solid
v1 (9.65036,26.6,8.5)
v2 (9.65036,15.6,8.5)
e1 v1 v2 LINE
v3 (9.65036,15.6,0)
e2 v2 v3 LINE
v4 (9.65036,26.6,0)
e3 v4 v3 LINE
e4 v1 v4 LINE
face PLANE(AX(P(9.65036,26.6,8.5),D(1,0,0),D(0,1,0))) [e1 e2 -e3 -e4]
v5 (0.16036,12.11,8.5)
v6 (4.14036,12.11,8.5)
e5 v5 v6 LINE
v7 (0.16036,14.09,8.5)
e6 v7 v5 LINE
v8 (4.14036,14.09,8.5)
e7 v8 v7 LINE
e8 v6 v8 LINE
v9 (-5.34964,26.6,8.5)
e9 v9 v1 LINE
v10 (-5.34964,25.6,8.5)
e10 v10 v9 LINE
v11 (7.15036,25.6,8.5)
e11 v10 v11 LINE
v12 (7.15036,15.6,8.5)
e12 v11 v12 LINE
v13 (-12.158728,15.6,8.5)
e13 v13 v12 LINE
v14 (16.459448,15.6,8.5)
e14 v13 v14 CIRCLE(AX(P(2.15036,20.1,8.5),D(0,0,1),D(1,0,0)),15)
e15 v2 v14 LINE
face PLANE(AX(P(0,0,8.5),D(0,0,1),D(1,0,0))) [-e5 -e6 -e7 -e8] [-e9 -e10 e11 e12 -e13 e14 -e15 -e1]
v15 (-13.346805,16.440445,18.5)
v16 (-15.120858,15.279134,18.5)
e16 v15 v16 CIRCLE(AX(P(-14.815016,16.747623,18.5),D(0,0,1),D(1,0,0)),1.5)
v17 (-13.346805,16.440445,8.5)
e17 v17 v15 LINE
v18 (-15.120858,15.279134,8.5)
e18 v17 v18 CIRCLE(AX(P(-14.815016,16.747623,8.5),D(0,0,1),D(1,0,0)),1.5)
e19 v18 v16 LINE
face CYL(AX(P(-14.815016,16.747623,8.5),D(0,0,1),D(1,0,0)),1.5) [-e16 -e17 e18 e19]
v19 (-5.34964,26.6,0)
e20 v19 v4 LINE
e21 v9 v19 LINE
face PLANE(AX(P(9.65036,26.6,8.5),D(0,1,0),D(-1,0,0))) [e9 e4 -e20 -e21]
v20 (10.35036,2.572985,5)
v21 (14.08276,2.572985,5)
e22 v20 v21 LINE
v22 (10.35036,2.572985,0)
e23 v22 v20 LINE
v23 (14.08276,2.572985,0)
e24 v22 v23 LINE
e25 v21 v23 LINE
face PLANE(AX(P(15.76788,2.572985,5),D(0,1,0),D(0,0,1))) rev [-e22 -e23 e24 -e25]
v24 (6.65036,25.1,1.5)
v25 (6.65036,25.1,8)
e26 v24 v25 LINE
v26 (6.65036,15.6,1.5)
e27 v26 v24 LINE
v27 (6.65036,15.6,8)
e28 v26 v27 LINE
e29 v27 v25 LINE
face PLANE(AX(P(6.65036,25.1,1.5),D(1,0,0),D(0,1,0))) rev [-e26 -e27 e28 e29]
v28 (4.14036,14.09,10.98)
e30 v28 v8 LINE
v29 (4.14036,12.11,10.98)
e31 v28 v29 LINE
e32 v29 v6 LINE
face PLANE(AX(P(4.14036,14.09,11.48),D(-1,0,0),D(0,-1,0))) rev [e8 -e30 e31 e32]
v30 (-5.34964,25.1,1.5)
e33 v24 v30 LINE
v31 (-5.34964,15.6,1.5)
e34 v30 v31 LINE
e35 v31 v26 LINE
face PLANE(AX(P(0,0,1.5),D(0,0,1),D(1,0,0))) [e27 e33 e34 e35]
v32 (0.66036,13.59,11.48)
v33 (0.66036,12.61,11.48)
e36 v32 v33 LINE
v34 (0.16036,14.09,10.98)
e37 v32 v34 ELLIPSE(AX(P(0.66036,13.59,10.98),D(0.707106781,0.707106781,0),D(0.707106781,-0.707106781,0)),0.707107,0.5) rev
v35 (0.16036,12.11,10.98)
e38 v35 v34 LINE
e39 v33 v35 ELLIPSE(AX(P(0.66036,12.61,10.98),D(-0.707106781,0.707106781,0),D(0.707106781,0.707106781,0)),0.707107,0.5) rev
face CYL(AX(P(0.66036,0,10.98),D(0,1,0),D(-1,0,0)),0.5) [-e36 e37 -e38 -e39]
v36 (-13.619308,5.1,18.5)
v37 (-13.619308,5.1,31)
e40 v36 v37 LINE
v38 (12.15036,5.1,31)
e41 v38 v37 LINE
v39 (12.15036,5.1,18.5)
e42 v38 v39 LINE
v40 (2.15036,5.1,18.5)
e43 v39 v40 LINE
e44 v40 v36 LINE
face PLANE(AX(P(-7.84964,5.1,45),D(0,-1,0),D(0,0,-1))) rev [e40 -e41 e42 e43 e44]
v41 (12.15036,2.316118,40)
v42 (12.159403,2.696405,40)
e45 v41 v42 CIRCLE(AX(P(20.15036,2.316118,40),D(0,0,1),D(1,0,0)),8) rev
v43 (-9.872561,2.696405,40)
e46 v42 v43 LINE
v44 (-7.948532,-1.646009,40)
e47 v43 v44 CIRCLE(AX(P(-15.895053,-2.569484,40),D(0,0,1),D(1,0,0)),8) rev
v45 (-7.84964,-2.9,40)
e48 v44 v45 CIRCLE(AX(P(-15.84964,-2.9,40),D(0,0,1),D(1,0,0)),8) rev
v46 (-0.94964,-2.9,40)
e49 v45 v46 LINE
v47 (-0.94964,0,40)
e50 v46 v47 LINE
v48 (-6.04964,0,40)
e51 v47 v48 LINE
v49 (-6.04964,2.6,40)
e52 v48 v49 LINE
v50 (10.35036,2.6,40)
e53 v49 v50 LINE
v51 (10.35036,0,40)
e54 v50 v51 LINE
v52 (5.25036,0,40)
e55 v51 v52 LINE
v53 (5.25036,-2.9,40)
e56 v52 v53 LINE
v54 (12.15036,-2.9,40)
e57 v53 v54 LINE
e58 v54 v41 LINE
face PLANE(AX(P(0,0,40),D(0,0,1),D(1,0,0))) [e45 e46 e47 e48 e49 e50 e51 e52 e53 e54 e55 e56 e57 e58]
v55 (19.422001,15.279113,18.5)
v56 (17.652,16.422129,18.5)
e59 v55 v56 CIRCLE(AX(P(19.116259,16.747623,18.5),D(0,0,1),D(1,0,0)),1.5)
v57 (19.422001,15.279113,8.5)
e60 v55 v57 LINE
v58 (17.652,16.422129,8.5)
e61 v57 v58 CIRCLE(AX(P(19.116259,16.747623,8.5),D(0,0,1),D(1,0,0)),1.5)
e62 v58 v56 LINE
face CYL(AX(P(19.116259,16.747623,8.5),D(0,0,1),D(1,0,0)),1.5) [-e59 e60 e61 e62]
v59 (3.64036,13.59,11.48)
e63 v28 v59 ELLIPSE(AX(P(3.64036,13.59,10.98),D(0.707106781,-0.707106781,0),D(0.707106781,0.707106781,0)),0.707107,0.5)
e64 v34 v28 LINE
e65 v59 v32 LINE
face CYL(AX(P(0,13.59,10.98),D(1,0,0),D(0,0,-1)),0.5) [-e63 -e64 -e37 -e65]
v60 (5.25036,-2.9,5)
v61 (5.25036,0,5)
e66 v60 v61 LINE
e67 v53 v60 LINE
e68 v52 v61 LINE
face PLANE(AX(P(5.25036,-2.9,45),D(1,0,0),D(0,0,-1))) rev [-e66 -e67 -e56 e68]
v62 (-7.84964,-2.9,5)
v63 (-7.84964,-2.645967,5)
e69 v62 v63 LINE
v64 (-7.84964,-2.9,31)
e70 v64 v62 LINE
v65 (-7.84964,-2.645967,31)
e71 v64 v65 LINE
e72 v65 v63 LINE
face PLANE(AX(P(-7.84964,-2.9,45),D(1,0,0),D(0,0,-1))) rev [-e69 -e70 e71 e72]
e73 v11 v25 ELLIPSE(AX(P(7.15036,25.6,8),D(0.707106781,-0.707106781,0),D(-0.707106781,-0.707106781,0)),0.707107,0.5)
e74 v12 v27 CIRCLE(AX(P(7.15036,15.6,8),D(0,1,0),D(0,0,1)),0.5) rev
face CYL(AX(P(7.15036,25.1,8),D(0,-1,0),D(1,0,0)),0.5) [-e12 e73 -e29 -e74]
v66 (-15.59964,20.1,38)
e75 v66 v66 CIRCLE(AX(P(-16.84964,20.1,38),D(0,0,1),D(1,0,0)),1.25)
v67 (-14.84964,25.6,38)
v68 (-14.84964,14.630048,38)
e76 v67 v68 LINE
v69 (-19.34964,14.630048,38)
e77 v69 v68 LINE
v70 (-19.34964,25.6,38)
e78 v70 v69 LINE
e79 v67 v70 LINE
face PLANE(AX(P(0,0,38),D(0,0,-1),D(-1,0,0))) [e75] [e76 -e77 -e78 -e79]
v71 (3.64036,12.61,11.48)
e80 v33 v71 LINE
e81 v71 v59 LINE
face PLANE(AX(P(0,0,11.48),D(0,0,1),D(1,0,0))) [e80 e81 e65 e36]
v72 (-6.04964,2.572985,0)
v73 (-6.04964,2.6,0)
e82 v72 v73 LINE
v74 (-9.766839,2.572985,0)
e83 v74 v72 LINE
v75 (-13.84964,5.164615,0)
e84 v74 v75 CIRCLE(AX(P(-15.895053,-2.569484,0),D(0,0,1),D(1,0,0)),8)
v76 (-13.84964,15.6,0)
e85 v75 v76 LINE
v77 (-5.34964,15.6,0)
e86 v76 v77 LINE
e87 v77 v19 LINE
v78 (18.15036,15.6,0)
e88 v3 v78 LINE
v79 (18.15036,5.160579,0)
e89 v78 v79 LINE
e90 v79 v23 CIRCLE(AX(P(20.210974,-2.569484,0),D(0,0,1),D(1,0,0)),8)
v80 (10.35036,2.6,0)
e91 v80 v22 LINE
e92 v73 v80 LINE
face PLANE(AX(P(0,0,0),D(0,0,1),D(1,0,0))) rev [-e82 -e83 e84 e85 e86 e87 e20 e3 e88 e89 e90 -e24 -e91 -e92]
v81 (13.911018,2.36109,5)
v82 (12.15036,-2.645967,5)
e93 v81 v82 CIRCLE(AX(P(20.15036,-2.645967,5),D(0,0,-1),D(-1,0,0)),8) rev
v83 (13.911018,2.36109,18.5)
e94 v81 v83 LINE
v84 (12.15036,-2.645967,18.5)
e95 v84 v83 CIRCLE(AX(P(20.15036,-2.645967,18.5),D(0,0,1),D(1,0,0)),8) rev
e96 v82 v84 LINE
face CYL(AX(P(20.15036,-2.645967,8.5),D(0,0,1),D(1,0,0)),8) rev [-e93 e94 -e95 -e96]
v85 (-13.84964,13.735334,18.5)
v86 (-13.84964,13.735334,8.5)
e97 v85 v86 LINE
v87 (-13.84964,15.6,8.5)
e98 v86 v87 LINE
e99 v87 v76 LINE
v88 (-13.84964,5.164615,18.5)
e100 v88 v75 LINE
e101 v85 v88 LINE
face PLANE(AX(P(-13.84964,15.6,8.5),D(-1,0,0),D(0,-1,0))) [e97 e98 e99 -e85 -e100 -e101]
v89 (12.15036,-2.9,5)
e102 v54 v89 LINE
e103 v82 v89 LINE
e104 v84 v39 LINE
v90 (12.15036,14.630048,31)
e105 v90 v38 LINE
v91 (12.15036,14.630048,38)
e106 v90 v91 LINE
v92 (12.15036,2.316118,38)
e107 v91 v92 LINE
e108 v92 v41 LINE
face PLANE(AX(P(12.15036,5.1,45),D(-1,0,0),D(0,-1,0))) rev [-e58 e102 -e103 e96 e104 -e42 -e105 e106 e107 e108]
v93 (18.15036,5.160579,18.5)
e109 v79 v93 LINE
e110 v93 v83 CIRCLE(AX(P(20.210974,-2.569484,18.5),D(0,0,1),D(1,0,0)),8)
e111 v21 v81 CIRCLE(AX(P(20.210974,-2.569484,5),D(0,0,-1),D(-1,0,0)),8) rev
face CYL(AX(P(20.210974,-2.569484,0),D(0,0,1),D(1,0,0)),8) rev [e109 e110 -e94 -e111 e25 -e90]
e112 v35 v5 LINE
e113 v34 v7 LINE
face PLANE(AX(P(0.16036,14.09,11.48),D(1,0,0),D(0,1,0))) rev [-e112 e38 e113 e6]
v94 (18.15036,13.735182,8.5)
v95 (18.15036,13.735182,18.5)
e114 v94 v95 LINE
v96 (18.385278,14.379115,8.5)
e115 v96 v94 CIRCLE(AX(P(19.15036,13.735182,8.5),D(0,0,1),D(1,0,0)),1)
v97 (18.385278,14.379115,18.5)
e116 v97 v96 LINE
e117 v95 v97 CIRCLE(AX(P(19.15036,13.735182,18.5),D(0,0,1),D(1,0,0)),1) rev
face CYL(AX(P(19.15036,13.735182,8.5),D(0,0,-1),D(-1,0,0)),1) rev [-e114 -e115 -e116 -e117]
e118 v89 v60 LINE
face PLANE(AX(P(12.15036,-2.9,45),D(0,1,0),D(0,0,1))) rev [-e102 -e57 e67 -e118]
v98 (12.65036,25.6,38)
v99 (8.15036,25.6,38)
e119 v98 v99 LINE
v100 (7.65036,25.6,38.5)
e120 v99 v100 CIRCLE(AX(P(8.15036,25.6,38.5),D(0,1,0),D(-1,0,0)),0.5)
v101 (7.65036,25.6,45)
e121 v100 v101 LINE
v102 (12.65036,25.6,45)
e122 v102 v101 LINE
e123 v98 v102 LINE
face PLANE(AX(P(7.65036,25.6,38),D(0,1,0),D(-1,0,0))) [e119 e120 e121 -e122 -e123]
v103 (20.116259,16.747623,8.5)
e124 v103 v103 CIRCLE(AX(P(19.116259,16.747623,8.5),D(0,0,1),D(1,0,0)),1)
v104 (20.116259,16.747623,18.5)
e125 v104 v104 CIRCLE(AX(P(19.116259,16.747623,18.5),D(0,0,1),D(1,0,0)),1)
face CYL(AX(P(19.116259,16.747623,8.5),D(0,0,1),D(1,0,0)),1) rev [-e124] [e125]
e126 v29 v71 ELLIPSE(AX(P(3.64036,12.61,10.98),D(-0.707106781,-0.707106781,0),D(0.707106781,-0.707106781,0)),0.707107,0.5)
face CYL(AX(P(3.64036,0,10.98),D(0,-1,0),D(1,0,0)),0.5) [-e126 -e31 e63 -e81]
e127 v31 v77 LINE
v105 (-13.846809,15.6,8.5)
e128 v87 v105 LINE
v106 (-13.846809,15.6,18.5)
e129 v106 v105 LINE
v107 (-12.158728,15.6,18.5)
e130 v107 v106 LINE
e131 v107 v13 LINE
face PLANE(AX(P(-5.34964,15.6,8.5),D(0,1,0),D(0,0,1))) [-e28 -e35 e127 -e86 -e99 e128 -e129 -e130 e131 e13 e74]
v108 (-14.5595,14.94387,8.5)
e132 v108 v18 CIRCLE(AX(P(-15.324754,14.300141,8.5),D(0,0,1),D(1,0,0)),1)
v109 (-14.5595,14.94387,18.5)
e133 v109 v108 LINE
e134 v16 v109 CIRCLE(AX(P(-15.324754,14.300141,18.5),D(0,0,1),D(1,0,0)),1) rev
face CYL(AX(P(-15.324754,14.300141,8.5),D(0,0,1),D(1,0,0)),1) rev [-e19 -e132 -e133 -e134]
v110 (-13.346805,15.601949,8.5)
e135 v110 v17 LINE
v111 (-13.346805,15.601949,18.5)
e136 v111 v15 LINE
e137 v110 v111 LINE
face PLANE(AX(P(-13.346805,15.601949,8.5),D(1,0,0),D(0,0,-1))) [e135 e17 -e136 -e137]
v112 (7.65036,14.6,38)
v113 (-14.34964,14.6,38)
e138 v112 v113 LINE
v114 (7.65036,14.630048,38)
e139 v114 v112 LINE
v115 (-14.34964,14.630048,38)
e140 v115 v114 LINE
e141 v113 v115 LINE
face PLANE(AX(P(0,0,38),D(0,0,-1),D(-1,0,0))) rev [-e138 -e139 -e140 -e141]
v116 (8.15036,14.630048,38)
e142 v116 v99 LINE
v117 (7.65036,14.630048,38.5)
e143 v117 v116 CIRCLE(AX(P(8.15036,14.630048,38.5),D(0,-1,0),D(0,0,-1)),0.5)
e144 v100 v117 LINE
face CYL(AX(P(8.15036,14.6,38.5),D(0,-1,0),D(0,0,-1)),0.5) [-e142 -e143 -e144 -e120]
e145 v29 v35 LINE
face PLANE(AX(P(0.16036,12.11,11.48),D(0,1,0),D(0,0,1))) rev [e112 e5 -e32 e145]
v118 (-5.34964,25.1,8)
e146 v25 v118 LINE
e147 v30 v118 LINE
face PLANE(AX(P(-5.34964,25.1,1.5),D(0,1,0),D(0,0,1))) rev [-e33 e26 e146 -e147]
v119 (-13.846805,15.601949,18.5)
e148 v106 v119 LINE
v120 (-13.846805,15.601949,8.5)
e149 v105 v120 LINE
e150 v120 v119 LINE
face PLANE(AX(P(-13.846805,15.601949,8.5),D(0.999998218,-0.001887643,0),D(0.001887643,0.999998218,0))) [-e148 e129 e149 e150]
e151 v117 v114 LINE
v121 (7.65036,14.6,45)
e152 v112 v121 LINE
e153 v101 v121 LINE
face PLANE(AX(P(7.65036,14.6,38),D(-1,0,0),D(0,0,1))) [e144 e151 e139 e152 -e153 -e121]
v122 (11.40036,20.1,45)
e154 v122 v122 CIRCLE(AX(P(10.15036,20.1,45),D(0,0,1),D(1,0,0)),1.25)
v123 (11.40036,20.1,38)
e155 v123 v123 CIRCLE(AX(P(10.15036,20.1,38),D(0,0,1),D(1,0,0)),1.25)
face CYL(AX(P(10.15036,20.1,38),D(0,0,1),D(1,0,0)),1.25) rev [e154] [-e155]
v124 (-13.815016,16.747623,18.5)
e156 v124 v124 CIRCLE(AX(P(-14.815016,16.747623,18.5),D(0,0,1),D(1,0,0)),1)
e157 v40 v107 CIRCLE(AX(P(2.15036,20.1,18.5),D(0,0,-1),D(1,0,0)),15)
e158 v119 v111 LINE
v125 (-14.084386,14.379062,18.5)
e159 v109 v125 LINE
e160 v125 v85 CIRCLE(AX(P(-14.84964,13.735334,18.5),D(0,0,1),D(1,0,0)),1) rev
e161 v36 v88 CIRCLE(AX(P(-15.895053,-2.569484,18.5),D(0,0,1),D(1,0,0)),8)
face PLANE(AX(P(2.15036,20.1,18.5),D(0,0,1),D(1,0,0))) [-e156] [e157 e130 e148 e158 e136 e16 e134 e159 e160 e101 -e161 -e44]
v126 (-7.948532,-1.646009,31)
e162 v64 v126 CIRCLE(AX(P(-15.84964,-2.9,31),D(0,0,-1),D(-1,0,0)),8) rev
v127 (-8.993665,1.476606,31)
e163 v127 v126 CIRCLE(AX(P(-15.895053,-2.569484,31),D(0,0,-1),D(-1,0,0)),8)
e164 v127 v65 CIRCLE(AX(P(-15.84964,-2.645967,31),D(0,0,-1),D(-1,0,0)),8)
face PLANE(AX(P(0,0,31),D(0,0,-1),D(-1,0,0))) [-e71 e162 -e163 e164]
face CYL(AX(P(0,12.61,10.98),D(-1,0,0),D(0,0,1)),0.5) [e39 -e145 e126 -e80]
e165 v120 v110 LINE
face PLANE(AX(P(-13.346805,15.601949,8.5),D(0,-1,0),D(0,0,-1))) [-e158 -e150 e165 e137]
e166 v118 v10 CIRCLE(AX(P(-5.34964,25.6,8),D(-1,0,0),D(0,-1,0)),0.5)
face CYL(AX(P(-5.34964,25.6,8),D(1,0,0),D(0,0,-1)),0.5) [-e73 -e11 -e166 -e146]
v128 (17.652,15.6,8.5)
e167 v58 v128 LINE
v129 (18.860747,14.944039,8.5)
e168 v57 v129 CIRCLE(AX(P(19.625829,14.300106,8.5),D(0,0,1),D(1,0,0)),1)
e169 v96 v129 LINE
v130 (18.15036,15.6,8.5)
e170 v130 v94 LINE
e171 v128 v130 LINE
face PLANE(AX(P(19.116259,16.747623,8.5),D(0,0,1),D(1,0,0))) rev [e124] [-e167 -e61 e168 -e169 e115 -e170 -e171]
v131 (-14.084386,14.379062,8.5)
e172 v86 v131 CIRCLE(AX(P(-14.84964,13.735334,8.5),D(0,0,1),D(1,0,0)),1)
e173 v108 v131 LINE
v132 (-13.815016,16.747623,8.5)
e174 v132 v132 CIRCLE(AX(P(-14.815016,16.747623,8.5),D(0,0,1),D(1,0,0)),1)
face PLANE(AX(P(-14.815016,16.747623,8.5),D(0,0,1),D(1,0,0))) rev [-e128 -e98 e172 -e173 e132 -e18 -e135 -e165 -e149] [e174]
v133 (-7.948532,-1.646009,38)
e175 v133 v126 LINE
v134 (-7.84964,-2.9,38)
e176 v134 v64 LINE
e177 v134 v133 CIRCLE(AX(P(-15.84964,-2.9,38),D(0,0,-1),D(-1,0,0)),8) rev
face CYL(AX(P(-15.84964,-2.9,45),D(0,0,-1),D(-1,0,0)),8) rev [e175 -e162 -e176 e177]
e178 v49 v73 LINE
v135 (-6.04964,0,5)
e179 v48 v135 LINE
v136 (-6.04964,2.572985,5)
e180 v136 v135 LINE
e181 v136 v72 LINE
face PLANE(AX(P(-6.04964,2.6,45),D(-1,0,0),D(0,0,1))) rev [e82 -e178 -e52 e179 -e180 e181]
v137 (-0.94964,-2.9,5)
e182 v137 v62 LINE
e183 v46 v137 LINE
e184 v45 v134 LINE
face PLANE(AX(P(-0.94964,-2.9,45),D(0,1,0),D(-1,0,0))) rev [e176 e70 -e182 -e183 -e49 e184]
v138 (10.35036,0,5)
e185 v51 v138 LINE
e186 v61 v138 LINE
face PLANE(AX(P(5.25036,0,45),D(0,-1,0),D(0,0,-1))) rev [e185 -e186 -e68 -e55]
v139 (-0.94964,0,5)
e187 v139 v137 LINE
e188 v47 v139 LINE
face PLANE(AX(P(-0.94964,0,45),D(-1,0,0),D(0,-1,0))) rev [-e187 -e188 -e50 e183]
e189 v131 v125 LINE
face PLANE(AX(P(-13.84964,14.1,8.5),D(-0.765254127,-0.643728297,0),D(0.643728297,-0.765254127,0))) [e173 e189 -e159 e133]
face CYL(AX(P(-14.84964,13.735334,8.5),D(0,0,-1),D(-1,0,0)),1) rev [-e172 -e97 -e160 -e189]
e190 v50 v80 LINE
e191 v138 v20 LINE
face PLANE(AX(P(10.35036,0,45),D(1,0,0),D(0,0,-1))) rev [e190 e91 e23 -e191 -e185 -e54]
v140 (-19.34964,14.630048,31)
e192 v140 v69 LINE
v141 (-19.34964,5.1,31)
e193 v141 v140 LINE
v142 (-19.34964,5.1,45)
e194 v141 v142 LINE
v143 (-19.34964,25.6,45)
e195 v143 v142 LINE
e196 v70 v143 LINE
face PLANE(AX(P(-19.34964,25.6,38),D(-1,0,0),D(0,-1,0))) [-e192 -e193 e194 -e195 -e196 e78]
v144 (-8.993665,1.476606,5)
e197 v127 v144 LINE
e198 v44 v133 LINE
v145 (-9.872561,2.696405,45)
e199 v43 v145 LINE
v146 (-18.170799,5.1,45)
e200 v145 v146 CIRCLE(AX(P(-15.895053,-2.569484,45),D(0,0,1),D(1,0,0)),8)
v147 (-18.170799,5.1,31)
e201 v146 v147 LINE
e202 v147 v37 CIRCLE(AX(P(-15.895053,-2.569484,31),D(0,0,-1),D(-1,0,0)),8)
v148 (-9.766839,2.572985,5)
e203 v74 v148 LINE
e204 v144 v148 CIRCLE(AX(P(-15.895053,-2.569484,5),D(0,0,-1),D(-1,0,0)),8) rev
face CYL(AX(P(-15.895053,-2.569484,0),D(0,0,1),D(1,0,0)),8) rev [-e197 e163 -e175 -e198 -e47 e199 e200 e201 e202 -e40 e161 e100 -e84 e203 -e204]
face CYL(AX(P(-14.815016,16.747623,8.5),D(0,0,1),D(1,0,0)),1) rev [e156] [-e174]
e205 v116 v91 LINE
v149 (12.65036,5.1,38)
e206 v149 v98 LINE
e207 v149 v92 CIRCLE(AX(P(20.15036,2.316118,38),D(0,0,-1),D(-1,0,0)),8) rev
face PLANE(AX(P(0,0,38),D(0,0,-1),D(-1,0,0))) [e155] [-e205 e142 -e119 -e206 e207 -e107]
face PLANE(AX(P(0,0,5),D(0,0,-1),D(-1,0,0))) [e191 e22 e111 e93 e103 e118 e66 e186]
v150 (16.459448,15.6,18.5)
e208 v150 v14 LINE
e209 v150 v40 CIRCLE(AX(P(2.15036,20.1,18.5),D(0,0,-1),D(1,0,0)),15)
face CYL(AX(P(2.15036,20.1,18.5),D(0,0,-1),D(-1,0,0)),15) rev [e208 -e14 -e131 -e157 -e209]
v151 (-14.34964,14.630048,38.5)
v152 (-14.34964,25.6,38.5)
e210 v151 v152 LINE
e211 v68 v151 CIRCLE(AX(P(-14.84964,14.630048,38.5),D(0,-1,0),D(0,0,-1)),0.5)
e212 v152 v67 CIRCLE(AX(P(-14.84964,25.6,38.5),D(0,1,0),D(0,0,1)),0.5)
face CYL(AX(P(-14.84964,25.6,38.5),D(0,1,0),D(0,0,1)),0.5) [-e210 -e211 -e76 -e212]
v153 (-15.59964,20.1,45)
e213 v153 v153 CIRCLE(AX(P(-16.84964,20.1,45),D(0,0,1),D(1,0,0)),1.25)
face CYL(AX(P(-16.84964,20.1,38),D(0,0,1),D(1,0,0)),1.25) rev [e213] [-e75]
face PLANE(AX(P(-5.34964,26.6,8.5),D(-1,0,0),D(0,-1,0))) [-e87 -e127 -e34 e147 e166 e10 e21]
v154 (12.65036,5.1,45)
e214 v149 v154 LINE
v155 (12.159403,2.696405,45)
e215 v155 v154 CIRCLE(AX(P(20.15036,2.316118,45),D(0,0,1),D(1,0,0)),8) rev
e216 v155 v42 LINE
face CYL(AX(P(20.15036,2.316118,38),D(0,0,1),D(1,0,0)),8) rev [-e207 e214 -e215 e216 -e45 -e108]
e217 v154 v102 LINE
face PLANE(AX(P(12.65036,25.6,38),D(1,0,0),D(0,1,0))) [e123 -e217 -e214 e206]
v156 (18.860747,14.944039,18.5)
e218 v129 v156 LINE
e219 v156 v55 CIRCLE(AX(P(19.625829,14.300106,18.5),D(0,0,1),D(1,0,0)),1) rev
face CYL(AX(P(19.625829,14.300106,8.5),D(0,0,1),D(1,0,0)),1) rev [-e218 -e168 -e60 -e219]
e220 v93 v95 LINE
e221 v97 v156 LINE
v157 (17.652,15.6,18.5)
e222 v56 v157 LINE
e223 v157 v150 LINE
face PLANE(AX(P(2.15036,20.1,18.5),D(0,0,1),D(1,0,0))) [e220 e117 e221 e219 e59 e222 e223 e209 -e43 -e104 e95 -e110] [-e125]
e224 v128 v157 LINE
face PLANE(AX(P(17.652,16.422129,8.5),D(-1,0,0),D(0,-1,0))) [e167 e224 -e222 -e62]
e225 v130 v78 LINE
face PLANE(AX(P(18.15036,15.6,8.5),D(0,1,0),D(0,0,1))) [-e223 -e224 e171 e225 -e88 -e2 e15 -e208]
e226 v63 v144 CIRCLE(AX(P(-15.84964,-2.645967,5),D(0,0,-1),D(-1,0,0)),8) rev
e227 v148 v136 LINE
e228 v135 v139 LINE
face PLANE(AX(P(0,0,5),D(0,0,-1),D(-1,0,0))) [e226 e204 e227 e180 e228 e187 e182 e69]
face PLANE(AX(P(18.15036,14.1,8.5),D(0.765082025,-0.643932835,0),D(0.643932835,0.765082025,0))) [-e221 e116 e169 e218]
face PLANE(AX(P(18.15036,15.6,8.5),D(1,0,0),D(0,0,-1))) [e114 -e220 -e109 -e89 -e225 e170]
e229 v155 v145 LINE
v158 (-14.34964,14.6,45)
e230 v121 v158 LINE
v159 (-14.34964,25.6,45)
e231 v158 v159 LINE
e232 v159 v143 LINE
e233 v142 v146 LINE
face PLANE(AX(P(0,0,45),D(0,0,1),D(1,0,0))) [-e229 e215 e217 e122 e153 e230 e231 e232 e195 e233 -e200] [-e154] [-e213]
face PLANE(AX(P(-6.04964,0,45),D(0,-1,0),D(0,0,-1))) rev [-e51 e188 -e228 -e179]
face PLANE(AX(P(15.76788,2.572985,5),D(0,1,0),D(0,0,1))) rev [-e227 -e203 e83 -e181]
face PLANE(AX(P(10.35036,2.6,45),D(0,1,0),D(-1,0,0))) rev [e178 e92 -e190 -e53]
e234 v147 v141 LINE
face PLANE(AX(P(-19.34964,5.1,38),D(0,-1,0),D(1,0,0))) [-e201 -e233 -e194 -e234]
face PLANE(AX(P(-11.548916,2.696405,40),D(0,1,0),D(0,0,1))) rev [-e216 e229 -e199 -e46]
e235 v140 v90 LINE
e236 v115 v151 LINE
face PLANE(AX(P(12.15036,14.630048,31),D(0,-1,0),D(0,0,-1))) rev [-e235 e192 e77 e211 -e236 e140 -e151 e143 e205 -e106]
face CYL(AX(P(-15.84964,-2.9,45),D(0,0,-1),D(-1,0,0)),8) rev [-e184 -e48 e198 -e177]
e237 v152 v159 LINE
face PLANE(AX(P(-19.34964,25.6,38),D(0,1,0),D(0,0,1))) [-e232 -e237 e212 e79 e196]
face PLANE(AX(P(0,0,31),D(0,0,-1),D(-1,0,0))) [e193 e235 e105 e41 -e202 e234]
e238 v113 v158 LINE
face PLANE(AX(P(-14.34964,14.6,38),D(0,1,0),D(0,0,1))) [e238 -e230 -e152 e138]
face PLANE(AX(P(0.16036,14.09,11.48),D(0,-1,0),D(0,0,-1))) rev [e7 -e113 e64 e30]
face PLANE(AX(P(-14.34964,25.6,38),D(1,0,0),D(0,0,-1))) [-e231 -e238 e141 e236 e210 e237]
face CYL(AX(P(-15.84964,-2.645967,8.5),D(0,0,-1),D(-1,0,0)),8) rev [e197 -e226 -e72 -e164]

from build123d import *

# Parameters (mm, degrees)
BOSS_EXTRUDE1_DEPTH = 45
SKETCH2_R           = 1.25
BOSS_EXTRUDE2_DEPTH = 7
FILLET1_R           = 8
BOSS_EXTRUDE3_DEPTH = 8.5
SKETCH7_W           = 12
SKETCH7_H           = 9.5
CUT_EXTRUDE1_DEPTH  = 7
BOSS_EXTRUDE4_DEPTH = 10
SKETCH9_W           = 3.98
SKETCH9_H           = 1.98
BOSS_EXTRUDE5_DEPTH = 2.98
SKETCH11_W          = 31.5
SKETCH11_H          = 9.530048311
BOSS_EXTRUDE6_DEPTH = 7
SKETCH16_R          = 1
BOSS_EXTRUDE7_DEPTH = 10
FILLET2_R           = 1
FILLET4_R           = 0.5
FILLET5_R           = 0.5
FILLET6_R           = 0.5
FILLET7_R           = 8
FILLET8_DEPTH       = 18.5
FILLET8_START       = 18.5
FILLET8_2_DEPTH     = 26.5
SKETCH17_R          = 8
CUT_EXTRUDE2_DEPTH  = 57.192438403
SKETCH18_W          = 26.905399266
SKETCH18_H          = 5.924124609
CUT_EXTRUDE3_DEPTH  = 5
SKETCH19_W          = 27.645914842
SKETCH19_H          = 7.775413549
CUT_EXTRUDE4_DEPTH  = 5


with BuildPart() as part:
    # Sketch1 → Boss-Extrude1 (new body)
    with BuildSketch(Plane.XY):
        Polygon((-6.049640288, 0), (-0.949640288, 0), (-0.949640288, -2.9), (-7.849640288, -2.9), (-7.849640288, 5.1), (12.150359712, 5.1), (12.150359712, -2.9), (5.250359712, -2.9), (5.250359712, 0), (10.350359712, 0), (10.350359712, 2.6), (-6.049640288, 2.6), align=None)
    extrude(amount=BOSS_EXTRUDE1_DEPTH)

    # Sketch2 → Boss-Extrude2 (add)
    with BuildSketch(Plane.XY.offset(45)):
        Polygon((-19.349640288, 25.6), (-19.349640288, 5.1), (12.650359712, 5.1), (12.650359712, 25.6), (7.650359712, 25.6), (7.650359712, 14.6), (-14.349640288, 14.6), (-14.349640288, 25.6), align=None)
        with Locations((10.150359712, 20.1)):
            Circle(SKETCH2_R, mode=Mode.SUBTRACT)
        with Locations((-16.849640288, 20.1)):
            Circle(SKETCH2_R, mode=Mode.SUBTRACT)
    extrude(amount=-BOSS_EXTRUDE2_DEPTH)

    # Fillet1
    # the kernel refuses this fillet: 8 mm, written as the material it adds along each edge
    with BuildSketch(Plane(origin=(-7.849640288, 5.1, 38), x_dir=(0, -1, 0), z_dir=(0, 0, 1))) as fillet1_piece_1:
        with BuildLine():
            CenterArc((FILLET1_R, -FILLET1_R), FILLET1_R, 90, 90)
            Line((0, -FILLET1_R), (0, 0))
            Line((0, 0), (FILLET1_R, 0))
        make_face()
    extrude(amount=7)
    with BuildSketch(Plane(origin=(12.150359712, 5.1, 38), x_dir=(0, -1, 0), z_dir=(0, 0, 1))) as fillet1_piece_2:
        with BuildLine():
            CenterArc((2.783882181, 8), FILLET1_R, 249.635865194, 20.364134806)
            Line((0, 0.5), (0, 0))
            Line((0, 0), (2.783882181, 0))
        make_face()
    extrude(amount=7)

    # Sketch4 → Boss-Extrude3 (add)
    with BuildSketch(Plane(origin=(0, 0, 0), x_dir=(-1, 0, 0), z_dir=(0, 0, -1))):
        Polygon((-18.150359712, 15.6), (-18.150359712, 5.1), (13.849640288, 5.1), (13.849640288, 15.6), (5.349640288, 15.6), (5.349640288, 26.6), (-9.650359712, 26.6), (-9.650359712, 15.6), align=None)
    extrude(amount=-BOSS_EXTRUDE3_DEPTH)

    # Sketch7 → Cut-Extrude1 (cut)
    with BuildSketch(Plane.XY.offset(8.5)):
        with Locations((0.650359712, 20.35)):
            Rectangle(SKETCH7_W, SKETCH7_H)
    extrude(amount=-CUT_EXTRUDE1_DEPTH, mode=Mode.SUBTRACT)

    # Sketch8 → Boss-Extrude4 (add)
    with BuildSketch(Plane.XY.offset(8.5)):
        with BuildLine():
            Line((-13.849640288, 15.6), (-12.158728309, 15.6))
            ThreePointArc((-12.158728309, 15.6), (2.150359712, 5.1), (16.459447733, 15.6))
            Line((16.459447733, 15.6), (18.150359712, 15.6))
            Line((18.150359712, 15.6), (18.150359712, 3.937972429))
            Line((18.150359712, 3.937972429), (-13.849640288, 3.937972429))
            Line((-13.849640288, 3.937972429), (-13.849640288, 15.6))
        make_face()
    extrude(amount=BOSS_EXTRUDE4_DEPTH)

    # Sketch9 → Boss-Extrude5 (add)
    with BuildSketch(Plane.XY.offset(8.5)):
        with Locations((2.150359712, 13.1)):
            Rectangle(SKETCH9_W, SKETCH9_H)
    extrude(amount=BOSS_EXTRUDE5_DEPTH)

    # Sketch11 → Boss-Extrude6 (add)
    with BuildSketch(Plane(origin=(0, 0, 38), x_dir=(-1, 0, 0), z_dir=(0, 0, -1))):
        with Locations((3.599640288, 9.865024156)):
            Rectangle(SKETCH11_W, SKETCH11_H)
    extrude(amount=BOSS_EXTRUDE6_DEPTH)

    # Sketch16 → Boss-Extrude7 (add)
    # profile 1 of 2: a face of its own
    with BuildSketch(Plane.XY.offset(18.5)):
        with BuildLine():
            Line((-13.346805139, 15.601949196), (-13.846805139, 15.601949196))
            Line((-13.846805139, 15.601949196), (-13.849640288, 14.1))
            Line((-13.849640288, 14.1), (-14.815015575, 15.247623037))
            ThreePointArc((-14.815015575, 15.247623037), (-15.7608574, 17.911832315), (-13.346805139, 16.44044538))
            Line((-13.346805139, 16.44044538), (-13.346805139, 15.601949196))
        make_face()
        with Locations((-14.815015575, 16.747623037)):
            Circle(SKETCH16_R, mode=Mode.SUBTRACT)
    # profile 2 of 2: a face of its own
    with BuildSketch(Plane.XY.offset(18.5)):
        with BuildLine():
            Line((17.652000257, 15.6), (18.150359712, 15.6))
            Line((18.150359712, 15.6), (18.150359712, 14.1))
            Line((18.150359712, 14.1), (19.116258964, 15.247623037))
            ThreePointArc((19.116258964, 15.247623037), (20.054810716, 17.91771731), (17.652000257, 16.422128892))
            Line((17.652000257, 16.422128892), (17.652000257, 15.6))
        make_face()
        with Locations((19.116258964, 16.747623037)):
            Circle(SKETCH16_R, mode=Mode.SUBTRACT)
    extrude(amount=-BOSS_EXTRUDE7_DEPTH)

    # Fillet2
    fillet2_edges = [part.edges().sort_by_distance(p)[0] for p in [
        (-13.849640288, 14.1, 13.5),
        (-14.815015575, 15.247623037, 13.5),
        (19.116258964, 15.247623037, 13.5),
        (18.150359712, 14.1, 13.5),
    ]]
    fillet(fillet2_edges, radius=FILLET2_R)

    # Fillet4
    fillet4_edges = [part.edges().sort_by_distance(p)[0] for p in [
        (0.160359712, 13.1, 11.48),
        (2.150359712, 12.11, 11.48),
        (4.140359712, 13.1, 11.48),
        (2.150359712, 14.09, 11.48),
    ]]
    fillet(fillet4_edges, radius=FILLET4_R)

    # Fillet5
    fillet5_edges = [part.edges().sort_by_distance(p)[0] for p in [
        (6.650359712, 20.35, 8.5),
        (0.650359712, 25.1, 8.5),
    ]]
    fillet(fillet5_edges, radius=FILLET5_R)

    # Fillet6
    fillet6_edges = [part.edges().sort_by_distance(p)[0] for p in [
        (-14.349640288, 20.115024155, 38),
        (7.650359712, 20.115024155, 38),
    ]]
    fillet(fillet6_edges, radius=FILLET6_R)

    # Fillet7
    fillet7_edges = [part.edges().sort_by_distance(p)[0] for p in [
        (-7.849640288, 5.1, 34.5),
    ]]
    fillet(fillet7_edges, radius=FILLET7_R - 0.0001)  # a hair under: the kernel refuses the full size

    # Fillet8: read off the stored shape, not the designer's step
    # Fillet8 outline → Fillet8 (add)
    with BuildSketch(Plane.XY):
        with BuildLine():
            Line((18.150359712, 5.1), (12.150359712, 5.1))
            Line((12.150359712, 5.1), (12.150359712, -2.645966692))
            ThreePointArc((12.150359712, -2.645966692), (13.825804392, 2.253012793), (18.150359712, 5.1))
        make_face()
        with BuildLine():
            Line((-7.849640288, 5.1), (-13.849640288, 5.1))
            ThreePointArc((-13.849640288, 5.1), (-9.525084967, 2.253012794), (-7.849640288, -2.645966692))
            Line((-7.849640288, -2.645966692), (-7.849640288, 5.1))
        make_face()
    extrude(amount=FILLET8_DEPTH)

    # Fillet8 2 outline → Fillet8 2 (add)
    with BuildSketch(Plane.XY.offset(FILLET8_START)):
        with BuildLine():
            Line((-7.849640288, 5.1), (-13.849640288, 5.1))
            ThreePointArc((-13.849640288, 5.1), (-9.525084967, 2.253012794), (-7.849640288, -2.645966692))
            Line((-7.849640288, -2.645966692), (-7.849640288, 5.1))
        make_face()
    extrude(amount=FILLET8_2_DEPTH)

    # Sketch17 → Cut-Extrude2 (cut, through all)
    with BuildSketch(Plane.XY.offset(45)):
        with Locations((-15.895053234, -2.569483857)):
            Circle(SKETCH17_R)
        with Locations((20.210973801, -2.569483857)):
            Circle(SKETCH17_R)
    extrude(amount=-CUT_EXTRUDE2_DEPTH, mode=Mode.SUBTRACT)

    # Sketch18 → Cut-Extrude3 (cut)
    with BuildSketch(Plane.XY.offset(45)):
        with Locations((1.903783169, -0.265657621)):
            Rectangle(SKETCH18_W, SKETCH18_H)
    extrude(amount=-CUT_EXTRUDE3_DEPTH, mode=Mode.SUBTRACT)

    # Sketch19 → Cut-Extrude4 (cut)
    with BuildSketch(Plane(origin=(0, 0, 0), x_dir=(-1, 0, 0), z_dir=(0, 0, -1))):
        with Locations((-1.944922923, -1.314721353)):
            Rectangle(SKETCH19_W, SKETCH19_H)
    extrude(amount=-CUT_EXTRUDE4_DEPTH, mode=Mode.SUBTRACT)


solid = part.part
